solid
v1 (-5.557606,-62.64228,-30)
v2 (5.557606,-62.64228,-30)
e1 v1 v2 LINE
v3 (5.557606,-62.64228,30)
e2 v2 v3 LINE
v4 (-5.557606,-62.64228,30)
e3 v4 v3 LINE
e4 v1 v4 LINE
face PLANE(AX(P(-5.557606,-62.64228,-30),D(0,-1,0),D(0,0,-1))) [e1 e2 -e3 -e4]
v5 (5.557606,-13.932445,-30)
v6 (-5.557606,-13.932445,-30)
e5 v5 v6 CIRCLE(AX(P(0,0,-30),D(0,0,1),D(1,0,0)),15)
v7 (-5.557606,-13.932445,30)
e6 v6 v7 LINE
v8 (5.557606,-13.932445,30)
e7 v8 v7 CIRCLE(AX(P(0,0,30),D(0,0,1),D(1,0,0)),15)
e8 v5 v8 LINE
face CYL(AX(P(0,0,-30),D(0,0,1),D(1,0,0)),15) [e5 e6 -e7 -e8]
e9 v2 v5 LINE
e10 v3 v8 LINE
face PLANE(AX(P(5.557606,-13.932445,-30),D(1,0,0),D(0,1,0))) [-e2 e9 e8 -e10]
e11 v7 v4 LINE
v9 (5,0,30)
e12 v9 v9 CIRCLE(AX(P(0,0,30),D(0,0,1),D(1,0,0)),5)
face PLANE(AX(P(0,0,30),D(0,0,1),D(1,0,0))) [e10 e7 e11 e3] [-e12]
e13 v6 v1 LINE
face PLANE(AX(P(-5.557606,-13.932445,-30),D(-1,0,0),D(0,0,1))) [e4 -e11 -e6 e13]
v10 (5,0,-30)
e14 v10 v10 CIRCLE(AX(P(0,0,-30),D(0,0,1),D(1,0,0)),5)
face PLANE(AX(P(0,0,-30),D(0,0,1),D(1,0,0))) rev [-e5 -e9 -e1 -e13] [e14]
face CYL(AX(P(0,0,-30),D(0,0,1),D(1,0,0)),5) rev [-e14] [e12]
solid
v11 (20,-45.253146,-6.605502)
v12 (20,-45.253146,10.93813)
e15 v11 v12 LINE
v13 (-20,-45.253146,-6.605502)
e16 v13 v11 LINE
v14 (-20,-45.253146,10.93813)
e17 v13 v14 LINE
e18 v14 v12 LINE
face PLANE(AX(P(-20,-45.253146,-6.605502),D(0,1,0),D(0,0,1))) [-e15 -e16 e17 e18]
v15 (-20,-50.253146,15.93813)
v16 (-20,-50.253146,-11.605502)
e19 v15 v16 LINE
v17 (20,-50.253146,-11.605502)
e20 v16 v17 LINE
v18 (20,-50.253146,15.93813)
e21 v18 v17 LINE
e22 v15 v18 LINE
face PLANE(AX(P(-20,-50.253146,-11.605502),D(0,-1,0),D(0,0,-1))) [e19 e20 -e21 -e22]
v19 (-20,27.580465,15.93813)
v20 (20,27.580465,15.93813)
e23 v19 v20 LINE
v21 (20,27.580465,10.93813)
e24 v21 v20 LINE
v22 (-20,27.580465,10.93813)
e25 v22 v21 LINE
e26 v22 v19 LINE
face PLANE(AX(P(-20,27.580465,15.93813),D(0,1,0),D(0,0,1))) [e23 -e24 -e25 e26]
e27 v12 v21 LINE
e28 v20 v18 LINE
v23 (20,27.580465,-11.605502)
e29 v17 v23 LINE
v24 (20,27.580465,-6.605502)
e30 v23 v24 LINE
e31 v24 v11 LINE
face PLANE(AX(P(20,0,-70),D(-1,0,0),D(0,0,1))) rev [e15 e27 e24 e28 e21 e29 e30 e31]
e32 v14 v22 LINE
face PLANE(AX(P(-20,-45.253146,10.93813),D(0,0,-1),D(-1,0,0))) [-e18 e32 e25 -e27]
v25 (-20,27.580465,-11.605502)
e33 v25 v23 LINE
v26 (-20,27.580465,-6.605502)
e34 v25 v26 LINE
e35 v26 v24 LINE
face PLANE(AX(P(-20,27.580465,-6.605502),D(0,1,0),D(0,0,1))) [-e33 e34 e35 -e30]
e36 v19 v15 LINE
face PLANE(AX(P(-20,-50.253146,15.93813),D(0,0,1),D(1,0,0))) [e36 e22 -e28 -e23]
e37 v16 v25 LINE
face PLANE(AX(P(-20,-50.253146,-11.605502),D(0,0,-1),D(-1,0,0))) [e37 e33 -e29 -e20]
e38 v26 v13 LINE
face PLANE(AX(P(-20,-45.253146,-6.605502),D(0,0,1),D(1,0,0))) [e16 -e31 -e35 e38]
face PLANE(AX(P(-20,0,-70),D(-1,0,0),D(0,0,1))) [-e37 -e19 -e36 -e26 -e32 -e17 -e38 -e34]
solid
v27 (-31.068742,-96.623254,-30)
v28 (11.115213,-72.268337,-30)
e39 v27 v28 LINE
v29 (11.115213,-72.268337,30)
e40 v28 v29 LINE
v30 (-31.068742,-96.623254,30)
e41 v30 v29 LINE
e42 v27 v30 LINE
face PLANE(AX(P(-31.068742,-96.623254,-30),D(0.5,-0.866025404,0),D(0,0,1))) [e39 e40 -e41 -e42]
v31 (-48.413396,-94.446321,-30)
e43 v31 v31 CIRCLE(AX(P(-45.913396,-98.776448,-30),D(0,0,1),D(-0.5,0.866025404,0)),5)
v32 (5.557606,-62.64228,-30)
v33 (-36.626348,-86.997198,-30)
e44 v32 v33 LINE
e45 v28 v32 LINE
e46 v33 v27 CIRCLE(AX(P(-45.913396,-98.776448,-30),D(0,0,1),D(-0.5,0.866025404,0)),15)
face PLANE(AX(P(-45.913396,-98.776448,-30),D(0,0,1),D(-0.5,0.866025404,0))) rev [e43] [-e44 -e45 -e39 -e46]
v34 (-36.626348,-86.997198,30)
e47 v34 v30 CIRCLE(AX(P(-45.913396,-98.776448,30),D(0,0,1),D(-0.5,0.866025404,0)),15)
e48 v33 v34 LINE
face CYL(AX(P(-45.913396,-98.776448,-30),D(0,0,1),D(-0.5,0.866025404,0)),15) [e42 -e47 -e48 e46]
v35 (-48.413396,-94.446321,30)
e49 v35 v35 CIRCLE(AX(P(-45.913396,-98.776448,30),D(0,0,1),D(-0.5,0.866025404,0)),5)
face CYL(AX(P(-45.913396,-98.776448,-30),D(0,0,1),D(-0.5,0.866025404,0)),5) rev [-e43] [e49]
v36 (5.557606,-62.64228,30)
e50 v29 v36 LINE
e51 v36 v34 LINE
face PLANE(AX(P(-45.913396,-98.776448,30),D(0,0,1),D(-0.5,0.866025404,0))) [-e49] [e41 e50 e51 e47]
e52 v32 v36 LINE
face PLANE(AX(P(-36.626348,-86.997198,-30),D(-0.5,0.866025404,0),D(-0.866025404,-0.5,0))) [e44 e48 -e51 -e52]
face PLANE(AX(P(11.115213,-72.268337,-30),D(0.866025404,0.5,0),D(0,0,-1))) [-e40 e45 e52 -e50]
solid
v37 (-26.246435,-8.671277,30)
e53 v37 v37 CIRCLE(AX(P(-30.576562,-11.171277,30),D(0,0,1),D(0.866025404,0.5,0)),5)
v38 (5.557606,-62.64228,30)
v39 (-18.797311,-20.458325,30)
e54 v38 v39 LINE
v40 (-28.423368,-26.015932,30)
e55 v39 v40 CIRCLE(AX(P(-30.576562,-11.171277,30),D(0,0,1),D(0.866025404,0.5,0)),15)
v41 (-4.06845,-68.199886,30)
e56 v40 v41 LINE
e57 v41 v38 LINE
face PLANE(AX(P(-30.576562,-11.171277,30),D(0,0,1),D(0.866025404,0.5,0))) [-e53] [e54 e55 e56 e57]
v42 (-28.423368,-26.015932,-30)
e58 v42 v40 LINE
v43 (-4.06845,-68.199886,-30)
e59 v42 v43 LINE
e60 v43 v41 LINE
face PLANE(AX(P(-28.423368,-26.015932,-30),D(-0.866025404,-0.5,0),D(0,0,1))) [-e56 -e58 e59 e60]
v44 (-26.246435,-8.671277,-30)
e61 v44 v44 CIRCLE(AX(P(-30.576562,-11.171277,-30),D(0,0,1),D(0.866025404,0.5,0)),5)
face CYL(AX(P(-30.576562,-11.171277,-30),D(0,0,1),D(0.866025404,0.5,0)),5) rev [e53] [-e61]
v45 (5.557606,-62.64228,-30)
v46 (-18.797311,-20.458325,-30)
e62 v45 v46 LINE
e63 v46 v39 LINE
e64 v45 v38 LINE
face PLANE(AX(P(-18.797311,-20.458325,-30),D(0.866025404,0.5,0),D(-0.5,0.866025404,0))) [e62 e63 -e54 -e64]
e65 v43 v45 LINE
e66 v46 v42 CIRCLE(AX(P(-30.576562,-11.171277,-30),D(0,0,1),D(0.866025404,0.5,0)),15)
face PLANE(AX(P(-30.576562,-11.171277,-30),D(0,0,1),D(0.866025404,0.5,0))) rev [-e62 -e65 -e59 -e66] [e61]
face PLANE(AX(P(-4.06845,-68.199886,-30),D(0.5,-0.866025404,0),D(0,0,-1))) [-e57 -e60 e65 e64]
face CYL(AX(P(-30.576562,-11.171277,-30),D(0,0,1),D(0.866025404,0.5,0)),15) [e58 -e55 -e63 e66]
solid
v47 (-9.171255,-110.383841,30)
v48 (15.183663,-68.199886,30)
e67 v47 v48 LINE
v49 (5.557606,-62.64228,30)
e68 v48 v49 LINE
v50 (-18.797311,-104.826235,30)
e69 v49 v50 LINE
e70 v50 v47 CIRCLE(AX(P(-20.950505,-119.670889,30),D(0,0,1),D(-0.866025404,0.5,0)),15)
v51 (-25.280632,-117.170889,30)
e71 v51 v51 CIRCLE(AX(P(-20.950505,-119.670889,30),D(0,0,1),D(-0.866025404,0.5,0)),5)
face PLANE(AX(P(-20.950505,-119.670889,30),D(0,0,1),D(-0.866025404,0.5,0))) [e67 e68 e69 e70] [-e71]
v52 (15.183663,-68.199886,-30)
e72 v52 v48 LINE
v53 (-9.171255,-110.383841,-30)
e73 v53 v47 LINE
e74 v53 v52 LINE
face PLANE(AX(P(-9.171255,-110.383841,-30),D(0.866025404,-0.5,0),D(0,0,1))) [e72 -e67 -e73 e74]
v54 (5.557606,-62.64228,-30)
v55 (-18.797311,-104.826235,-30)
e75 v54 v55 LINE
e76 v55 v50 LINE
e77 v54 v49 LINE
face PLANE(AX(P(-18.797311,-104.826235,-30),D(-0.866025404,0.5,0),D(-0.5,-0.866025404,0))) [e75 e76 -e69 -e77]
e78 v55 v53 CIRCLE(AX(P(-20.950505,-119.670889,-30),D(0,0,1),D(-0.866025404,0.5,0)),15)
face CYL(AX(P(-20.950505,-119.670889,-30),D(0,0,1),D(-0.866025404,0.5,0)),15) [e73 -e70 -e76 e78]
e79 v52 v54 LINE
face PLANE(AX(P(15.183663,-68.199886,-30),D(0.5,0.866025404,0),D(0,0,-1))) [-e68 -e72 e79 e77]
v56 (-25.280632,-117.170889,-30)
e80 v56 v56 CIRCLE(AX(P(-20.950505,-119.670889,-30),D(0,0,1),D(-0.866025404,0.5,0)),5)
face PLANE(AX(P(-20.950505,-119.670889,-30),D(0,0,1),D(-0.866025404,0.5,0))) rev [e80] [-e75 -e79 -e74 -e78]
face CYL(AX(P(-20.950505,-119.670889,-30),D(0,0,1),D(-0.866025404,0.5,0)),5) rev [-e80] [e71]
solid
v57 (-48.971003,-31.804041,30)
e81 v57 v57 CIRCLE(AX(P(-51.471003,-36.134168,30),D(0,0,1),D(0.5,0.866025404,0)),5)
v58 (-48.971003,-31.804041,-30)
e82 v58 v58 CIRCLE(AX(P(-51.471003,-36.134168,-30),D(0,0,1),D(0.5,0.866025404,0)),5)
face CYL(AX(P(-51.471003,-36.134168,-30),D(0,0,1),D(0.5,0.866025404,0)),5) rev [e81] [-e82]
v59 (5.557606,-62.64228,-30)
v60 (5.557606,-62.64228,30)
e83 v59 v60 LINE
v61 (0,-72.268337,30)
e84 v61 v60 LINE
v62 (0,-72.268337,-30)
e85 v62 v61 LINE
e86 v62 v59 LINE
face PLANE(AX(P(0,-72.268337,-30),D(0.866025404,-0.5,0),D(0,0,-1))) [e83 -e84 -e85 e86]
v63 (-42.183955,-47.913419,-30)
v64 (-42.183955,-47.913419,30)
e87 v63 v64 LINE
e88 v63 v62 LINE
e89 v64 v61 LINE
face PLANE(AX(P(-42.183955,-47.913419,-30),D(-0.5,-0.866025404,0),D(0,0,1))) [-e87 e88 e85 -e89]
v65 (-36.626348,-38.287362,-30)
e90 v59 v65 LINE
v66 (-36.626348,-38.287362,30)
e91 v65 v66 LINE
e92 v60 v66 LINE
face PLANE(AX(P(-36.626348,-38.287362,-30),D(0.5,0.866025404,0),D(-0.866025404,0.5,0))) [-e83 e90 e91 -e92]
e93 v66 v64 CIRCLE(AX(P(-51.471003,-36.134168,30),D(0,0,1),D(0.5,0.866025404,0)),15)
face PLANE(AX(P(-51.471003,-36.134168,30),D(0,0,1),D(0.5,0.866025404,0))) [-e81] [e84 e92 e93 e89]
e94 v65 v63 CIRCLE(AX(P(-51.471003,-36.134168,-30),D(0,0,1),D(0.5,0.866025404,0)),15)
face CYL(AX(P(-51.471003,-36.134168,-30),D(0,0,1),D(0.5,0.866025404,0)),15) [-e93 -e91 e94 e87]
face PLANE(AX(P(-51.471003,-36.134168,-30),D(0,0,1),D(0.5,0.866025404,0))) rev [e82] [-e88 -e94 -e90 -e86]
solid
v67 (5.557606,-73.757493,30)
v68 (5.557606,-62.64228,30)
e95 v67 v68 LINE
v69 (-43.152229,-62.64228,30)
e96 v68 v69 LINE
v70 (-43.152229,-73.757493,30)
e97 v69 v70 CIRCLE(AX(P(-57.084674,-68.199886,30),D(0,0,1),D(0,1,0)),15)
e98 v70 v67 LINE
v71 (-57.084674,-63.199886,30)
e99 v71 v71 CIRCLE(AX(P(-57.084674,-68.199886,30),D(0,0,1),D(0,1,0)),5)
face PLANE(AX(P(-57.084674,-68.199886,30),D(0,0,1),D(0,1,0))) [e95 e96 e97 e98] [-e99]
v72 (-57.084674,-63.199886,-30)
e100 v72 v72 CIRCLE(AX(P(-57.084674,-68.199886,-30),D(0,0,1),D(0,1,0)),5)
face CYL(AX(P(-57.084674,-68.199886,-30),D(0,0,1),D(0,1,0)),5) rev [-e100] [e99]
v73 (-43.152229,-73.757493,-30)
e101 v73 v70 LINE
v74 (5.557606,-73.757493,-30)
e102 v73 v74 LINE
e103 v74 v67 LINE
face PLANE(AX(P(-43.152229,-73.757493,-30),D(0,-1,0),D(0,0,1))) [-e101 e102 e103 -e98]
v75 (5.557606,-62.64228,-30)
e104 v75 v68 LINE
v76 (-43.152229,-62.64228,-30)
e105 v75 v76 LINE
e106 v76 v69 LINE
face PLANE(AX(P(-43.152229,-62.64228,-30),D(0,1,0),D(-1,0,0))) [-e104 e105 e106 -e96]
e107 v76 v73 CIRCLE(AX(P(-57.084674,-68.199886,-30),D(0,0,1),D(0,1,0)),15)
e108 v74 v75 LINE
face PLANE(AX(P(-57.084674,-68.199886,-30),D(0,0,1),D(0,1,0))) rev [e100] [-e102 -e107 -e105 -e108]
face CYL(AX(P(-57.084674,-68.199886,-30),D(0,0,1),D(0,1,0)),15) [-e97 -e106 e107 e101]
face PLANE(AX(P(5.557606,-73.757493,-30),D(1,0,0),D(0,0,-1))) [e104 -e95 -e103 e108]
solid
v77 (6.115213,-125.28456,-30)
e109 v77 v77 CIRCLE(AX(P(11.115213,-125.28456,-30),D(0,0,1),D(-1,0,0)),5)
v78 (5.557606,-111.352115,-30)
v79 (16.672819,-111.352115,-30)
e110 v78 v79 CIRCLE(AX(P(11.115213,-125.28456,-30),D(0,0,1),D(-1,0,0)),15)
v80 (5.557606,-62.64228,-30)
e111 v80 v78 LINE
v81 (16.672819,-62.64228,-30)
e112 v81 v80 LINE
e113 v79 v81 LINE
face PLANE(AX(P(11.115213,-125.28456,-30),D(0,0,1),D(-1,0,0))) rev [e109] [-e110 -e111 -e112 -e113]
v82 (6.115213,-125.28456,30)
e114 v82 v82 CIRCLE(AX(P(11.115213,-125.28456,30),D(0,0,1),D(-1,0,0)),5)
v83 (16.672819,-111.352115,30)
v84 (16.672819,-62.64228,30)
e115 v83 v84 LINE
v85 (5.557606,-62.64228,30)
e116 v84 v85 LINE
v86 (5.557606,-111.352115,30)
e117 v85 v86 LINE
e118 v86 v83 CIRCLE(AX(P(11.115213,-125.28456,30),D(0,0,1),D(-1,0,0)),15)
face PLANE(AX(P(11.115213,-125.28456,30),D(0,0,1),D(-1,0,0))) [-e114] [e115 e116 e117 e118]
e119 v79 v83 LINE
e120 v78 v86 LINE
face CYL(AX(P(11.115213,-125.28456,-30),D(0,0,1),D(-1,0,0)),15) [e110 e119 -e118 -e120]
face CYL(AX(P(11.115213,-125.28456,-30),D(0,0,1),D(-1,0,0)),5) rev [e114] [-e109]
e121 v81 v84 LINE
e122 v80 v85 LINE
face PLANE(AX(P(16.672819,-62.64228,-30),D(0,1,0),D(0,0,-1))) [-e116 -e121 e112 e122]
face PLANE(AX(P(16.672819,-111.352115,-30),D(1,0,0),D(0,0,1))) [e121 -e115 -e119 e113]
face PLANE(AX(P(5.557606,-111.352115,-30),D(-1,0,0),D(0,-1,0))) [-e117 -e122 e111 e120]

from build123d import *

# Parameters (mm, degrees)
EXTRUDE_5_DEPTH         = 30
EXTRUDE_5_DEPTH_BACK    = 30
F_1_FR_R                = 5
EXTRUDE_6_DEPTH         = 20
EXTRUDE_6_DEPTH_BACK    = 20
MOVE_START              = -30
MOVE_BODY_2_OUTLINE_R   = 5
MOVE_BODY_2_DEPTH       = 60
MOVE_BODY_2_2_OUTLINE_R = 5
MOVE_BODY_2_2_DEPTH     = 60
MOVE_BODY_2_3_OUTLINE_R = 5
MOVE_BODY_2_3_DEPTH     = 60
MOVE_BODY_2_4_OUTLINE_R = 5
MOVE_BODY_2_4_DEPTH     = 60
MOVE_BODY_2_5_OUTLINE_R = 5
MOVE_BODY_2_5_DEPTH     = 60
MOVE_BODY_2_6_OUTLINE_R = 5
MOVE_BODY_2_6_DEPTH     = 60


# Read off the part's stored shape, not the designer's step: Тело-Переместить/Копировать2
with BuildPart() as part:
    # Эскиз1_fr → Бобышка-Вытянуть5 (new, two sides: drawn at the far end of the back side and taken through both)
    with BuildSketch(Plane.XY.offset(-EXTRUDE_5_DEPTH_BACK)):
        with BuildLine():
            Line((-5.557606452, -13.932444528), (-5.557606452, -62.642280008))
            Line((-5.557606452, -62.642280008), (5.557606452, -62.642280008))
            Line((5.557606452, -62.642280008), (5.557606452, -13.932444528))
            ThreePointArc((5.557606452, -13.932444528), (0, 15), (-5.557606452, -13.932444528))
        make_face()
        Circle(F_1_FR_R, mode=Mode.SUBTRACT)
    extrude(amount=EXTRUDE_5_DEPTH + EXTRUDE_5_DEPTH_BACK)


with BuildPart() as body_2:
    # Эскиз3 → Бобышка-Вытянуть6 (new, two sides: drawn at the far end of the back side and taken through both)
    with BuildSketch(Plane(origin=(0, 0, 0), x_dir=(0, 0, -1), z_dir=(1, 0, 0)).offset(-EXTRUDE_6_DEPTH_BACK)):
        Polygon((-58.394498043, -50.25314581), (-85.938130262, -50.25314581), (-85.938130262, 27.580465306), (-80.938130262, 27.580465306), (-80.938130262, -45.25314581), (-63.394498043, -45.25314581), (-63.394498043, 27.580465306), (-58.394498043, 27.580465306), align=None)
    extrude(amount=EXTRUDE_6_DEPTH + EXTRUDE_6_DEPTH_BACK)


with BuildPart() as body_2_1:
    # Move Body 1: moved
    add(body_2.part.moved(Location((0, 0, -70))))


with BuildPart() as body_3:
    # Move Body 2 outline → Move Body 2 (new body)
    with BuildSketch(Plane.XY.offset(MOVE_START)):
        with BuildLine():
            Line((5.557606452, -62.642280008), (5.557606452, -111.352115487))
            ThreePointArc((5.557606452, -111.352115487), (11.115212904, -140.284560015), (16.672819356, -111.352115487))
            Line((16.672819356, -111.352115487), (16.672819356, -62.642280008))
            Line((16.672819356, -62.642280008), (5.557606452, -62.642280008))
        make_face()
        with Locations((11.115212904, -125.284560015)):
            Circle(MOVE_BODY_2_OUTLINE_R, mode=Mode.SUBTRACT)
    extrude(amount=MOVE_BODY_2_DEPTH)


with BuildPart() as body_4:
    # Move Body 2 2 outline → Move Body 2 2 (new body)
    with BuildSketch(Plane.XY.offset(MOVE_START)):
        with BuildLine():
            Line((5.557606452, -62.642280008), (-18.797311288, -104.826234947))
            ThreePointArc((-18.797311288, -104.826234947), (-28.450505179, -132.661270128), (-9.171254544, -110.383841399))
            Line((-9.171254544, -110.383841399), (15.183663196, -68.19988646))
            Line((15.183663196, -68.19988646), (5.557606452, -62.642280008))
        make_face()
        with Locations((-20.95050518, -119.670889071)):
            Circle(MOVE_BODY_2_2_OUTLINE_R, mode=Mode.SUBTRACT)
    extrude(amount=MOVE_BODY_2_2_DEPTH)


with BuildPart() as body_5:
    # Move Body 2 3 outline → Move Body 2 3 (new body)
    with BuildSketch(Plane.XY.offset(MOVE_START)):
        with BuildLine():
            Line((5.557606452, -62.642280008), (-36.626348487, -86.997197747))
            ThreePointArc((-36.626348487, -86.997197747), (-58.903777216, -106.276448382), (-31.068742035, -96.623254491))
            Line((-31.068742035, -96.623254491), (11.115212904, -72.268336751))
            Line((11.115212904, -72.268336751), (5.557606452, -62.642280008))
        make_face()
        with Locations((-45.913396159, -98.776448383)):
            Circle(MOVE_BODY_2_3_OUTLINE_R, mode=Mode.SUBTRACT)
    extrude(amount=MOVE_BODY_2_3_DEPTH)


with BuildPart() as body_6:
    # Move Body 2 4 outline → Move Body 2 4 (new body)
    with BuildSketch(Plane.XY.offset(MOVE_START)):
        with BuildLine():
            Line((5.557606452, -62.642280008), (-43.152229028, -62.642280008))
            ThreePointArc((-43.152229028, -62.642280008), (-72.084673555, -68.19988646), (-43.152229028, -73.757492912))
            Line((-43.152229028, -73.757492912), (5.557606452, -73.757492912))
            Line((5.557606452, -73.757492912), (5.557606452, -62.642280008))
        make_face()
        with Locations((-57.084673555, -68.19988646)):
            Circle(MOVE_BODY_2_4_OUTLINE_R, mode=Mode.SUBTRACT)
    extrude(amount=MOVE_BODY_2_4_DEPTH)


with BuildPart() as body_7:
    # Move Body 2 5 outline → Move Body 2 5 (new body)
    with BuildSketch(Plane.XY.offset(MOVE_START)):
        with BuildLine():
            Line((5.557606452, -62.642280008), (-36.626348487, -38.287362268))
            ThreePointArc((-36.626348487, -38.287362268), (-64.461383667, -28.634168373), (-42.18395494, -47.913419011))
            Line((-42.18395494, -47.913419011), (0, -72.268336751))
            Line((0, -72.268336751), (5.557606452, -62.642280008))
        make_face()
        with Locations((-51.471002611, -36.134168376)):
            Circle(MOVE_BODY_2_5_OUTLINE_R, mode=Mode.SUBTRACT)
    extrude(amount=MOVE_BODY_2_5_DEPTH)


with BuildPart() as body_8:
    # Move Body 2 6 outline → Move Body 2 6 (new body)
    with BuildSketch(Plane.XY.offset(MOVE_START)):
        with BuildLine():
            Line((5.557606452, -62.642280008), (-18.797311288, -20.458325068))
            ThreePointArc((-18.797311288, -20.458325068), (-38.076561924, 1.819103661), (-28.423368031, -26.01593152))
            Line((-28.423368031, -26.01593152), (-4.068450291, -68.19988646))
            Line((-4.068450291, -68.19988646), (5.557606452, -62.642280008))
        make_face()
        with Locations((-30.576561923, -11.171277396)):
            Circle(MOVE_BODY_2_6_OUTLINE_R, mode=Mode.SUBTRACT)
    extrude(amount=MOVE_BODY_2_6_DEPTH)


solid = Compound([part.part, body_2_1.part, body_3.part, body_4.part, body_5.part, body_6.part, body_7.part, body_8.part])
